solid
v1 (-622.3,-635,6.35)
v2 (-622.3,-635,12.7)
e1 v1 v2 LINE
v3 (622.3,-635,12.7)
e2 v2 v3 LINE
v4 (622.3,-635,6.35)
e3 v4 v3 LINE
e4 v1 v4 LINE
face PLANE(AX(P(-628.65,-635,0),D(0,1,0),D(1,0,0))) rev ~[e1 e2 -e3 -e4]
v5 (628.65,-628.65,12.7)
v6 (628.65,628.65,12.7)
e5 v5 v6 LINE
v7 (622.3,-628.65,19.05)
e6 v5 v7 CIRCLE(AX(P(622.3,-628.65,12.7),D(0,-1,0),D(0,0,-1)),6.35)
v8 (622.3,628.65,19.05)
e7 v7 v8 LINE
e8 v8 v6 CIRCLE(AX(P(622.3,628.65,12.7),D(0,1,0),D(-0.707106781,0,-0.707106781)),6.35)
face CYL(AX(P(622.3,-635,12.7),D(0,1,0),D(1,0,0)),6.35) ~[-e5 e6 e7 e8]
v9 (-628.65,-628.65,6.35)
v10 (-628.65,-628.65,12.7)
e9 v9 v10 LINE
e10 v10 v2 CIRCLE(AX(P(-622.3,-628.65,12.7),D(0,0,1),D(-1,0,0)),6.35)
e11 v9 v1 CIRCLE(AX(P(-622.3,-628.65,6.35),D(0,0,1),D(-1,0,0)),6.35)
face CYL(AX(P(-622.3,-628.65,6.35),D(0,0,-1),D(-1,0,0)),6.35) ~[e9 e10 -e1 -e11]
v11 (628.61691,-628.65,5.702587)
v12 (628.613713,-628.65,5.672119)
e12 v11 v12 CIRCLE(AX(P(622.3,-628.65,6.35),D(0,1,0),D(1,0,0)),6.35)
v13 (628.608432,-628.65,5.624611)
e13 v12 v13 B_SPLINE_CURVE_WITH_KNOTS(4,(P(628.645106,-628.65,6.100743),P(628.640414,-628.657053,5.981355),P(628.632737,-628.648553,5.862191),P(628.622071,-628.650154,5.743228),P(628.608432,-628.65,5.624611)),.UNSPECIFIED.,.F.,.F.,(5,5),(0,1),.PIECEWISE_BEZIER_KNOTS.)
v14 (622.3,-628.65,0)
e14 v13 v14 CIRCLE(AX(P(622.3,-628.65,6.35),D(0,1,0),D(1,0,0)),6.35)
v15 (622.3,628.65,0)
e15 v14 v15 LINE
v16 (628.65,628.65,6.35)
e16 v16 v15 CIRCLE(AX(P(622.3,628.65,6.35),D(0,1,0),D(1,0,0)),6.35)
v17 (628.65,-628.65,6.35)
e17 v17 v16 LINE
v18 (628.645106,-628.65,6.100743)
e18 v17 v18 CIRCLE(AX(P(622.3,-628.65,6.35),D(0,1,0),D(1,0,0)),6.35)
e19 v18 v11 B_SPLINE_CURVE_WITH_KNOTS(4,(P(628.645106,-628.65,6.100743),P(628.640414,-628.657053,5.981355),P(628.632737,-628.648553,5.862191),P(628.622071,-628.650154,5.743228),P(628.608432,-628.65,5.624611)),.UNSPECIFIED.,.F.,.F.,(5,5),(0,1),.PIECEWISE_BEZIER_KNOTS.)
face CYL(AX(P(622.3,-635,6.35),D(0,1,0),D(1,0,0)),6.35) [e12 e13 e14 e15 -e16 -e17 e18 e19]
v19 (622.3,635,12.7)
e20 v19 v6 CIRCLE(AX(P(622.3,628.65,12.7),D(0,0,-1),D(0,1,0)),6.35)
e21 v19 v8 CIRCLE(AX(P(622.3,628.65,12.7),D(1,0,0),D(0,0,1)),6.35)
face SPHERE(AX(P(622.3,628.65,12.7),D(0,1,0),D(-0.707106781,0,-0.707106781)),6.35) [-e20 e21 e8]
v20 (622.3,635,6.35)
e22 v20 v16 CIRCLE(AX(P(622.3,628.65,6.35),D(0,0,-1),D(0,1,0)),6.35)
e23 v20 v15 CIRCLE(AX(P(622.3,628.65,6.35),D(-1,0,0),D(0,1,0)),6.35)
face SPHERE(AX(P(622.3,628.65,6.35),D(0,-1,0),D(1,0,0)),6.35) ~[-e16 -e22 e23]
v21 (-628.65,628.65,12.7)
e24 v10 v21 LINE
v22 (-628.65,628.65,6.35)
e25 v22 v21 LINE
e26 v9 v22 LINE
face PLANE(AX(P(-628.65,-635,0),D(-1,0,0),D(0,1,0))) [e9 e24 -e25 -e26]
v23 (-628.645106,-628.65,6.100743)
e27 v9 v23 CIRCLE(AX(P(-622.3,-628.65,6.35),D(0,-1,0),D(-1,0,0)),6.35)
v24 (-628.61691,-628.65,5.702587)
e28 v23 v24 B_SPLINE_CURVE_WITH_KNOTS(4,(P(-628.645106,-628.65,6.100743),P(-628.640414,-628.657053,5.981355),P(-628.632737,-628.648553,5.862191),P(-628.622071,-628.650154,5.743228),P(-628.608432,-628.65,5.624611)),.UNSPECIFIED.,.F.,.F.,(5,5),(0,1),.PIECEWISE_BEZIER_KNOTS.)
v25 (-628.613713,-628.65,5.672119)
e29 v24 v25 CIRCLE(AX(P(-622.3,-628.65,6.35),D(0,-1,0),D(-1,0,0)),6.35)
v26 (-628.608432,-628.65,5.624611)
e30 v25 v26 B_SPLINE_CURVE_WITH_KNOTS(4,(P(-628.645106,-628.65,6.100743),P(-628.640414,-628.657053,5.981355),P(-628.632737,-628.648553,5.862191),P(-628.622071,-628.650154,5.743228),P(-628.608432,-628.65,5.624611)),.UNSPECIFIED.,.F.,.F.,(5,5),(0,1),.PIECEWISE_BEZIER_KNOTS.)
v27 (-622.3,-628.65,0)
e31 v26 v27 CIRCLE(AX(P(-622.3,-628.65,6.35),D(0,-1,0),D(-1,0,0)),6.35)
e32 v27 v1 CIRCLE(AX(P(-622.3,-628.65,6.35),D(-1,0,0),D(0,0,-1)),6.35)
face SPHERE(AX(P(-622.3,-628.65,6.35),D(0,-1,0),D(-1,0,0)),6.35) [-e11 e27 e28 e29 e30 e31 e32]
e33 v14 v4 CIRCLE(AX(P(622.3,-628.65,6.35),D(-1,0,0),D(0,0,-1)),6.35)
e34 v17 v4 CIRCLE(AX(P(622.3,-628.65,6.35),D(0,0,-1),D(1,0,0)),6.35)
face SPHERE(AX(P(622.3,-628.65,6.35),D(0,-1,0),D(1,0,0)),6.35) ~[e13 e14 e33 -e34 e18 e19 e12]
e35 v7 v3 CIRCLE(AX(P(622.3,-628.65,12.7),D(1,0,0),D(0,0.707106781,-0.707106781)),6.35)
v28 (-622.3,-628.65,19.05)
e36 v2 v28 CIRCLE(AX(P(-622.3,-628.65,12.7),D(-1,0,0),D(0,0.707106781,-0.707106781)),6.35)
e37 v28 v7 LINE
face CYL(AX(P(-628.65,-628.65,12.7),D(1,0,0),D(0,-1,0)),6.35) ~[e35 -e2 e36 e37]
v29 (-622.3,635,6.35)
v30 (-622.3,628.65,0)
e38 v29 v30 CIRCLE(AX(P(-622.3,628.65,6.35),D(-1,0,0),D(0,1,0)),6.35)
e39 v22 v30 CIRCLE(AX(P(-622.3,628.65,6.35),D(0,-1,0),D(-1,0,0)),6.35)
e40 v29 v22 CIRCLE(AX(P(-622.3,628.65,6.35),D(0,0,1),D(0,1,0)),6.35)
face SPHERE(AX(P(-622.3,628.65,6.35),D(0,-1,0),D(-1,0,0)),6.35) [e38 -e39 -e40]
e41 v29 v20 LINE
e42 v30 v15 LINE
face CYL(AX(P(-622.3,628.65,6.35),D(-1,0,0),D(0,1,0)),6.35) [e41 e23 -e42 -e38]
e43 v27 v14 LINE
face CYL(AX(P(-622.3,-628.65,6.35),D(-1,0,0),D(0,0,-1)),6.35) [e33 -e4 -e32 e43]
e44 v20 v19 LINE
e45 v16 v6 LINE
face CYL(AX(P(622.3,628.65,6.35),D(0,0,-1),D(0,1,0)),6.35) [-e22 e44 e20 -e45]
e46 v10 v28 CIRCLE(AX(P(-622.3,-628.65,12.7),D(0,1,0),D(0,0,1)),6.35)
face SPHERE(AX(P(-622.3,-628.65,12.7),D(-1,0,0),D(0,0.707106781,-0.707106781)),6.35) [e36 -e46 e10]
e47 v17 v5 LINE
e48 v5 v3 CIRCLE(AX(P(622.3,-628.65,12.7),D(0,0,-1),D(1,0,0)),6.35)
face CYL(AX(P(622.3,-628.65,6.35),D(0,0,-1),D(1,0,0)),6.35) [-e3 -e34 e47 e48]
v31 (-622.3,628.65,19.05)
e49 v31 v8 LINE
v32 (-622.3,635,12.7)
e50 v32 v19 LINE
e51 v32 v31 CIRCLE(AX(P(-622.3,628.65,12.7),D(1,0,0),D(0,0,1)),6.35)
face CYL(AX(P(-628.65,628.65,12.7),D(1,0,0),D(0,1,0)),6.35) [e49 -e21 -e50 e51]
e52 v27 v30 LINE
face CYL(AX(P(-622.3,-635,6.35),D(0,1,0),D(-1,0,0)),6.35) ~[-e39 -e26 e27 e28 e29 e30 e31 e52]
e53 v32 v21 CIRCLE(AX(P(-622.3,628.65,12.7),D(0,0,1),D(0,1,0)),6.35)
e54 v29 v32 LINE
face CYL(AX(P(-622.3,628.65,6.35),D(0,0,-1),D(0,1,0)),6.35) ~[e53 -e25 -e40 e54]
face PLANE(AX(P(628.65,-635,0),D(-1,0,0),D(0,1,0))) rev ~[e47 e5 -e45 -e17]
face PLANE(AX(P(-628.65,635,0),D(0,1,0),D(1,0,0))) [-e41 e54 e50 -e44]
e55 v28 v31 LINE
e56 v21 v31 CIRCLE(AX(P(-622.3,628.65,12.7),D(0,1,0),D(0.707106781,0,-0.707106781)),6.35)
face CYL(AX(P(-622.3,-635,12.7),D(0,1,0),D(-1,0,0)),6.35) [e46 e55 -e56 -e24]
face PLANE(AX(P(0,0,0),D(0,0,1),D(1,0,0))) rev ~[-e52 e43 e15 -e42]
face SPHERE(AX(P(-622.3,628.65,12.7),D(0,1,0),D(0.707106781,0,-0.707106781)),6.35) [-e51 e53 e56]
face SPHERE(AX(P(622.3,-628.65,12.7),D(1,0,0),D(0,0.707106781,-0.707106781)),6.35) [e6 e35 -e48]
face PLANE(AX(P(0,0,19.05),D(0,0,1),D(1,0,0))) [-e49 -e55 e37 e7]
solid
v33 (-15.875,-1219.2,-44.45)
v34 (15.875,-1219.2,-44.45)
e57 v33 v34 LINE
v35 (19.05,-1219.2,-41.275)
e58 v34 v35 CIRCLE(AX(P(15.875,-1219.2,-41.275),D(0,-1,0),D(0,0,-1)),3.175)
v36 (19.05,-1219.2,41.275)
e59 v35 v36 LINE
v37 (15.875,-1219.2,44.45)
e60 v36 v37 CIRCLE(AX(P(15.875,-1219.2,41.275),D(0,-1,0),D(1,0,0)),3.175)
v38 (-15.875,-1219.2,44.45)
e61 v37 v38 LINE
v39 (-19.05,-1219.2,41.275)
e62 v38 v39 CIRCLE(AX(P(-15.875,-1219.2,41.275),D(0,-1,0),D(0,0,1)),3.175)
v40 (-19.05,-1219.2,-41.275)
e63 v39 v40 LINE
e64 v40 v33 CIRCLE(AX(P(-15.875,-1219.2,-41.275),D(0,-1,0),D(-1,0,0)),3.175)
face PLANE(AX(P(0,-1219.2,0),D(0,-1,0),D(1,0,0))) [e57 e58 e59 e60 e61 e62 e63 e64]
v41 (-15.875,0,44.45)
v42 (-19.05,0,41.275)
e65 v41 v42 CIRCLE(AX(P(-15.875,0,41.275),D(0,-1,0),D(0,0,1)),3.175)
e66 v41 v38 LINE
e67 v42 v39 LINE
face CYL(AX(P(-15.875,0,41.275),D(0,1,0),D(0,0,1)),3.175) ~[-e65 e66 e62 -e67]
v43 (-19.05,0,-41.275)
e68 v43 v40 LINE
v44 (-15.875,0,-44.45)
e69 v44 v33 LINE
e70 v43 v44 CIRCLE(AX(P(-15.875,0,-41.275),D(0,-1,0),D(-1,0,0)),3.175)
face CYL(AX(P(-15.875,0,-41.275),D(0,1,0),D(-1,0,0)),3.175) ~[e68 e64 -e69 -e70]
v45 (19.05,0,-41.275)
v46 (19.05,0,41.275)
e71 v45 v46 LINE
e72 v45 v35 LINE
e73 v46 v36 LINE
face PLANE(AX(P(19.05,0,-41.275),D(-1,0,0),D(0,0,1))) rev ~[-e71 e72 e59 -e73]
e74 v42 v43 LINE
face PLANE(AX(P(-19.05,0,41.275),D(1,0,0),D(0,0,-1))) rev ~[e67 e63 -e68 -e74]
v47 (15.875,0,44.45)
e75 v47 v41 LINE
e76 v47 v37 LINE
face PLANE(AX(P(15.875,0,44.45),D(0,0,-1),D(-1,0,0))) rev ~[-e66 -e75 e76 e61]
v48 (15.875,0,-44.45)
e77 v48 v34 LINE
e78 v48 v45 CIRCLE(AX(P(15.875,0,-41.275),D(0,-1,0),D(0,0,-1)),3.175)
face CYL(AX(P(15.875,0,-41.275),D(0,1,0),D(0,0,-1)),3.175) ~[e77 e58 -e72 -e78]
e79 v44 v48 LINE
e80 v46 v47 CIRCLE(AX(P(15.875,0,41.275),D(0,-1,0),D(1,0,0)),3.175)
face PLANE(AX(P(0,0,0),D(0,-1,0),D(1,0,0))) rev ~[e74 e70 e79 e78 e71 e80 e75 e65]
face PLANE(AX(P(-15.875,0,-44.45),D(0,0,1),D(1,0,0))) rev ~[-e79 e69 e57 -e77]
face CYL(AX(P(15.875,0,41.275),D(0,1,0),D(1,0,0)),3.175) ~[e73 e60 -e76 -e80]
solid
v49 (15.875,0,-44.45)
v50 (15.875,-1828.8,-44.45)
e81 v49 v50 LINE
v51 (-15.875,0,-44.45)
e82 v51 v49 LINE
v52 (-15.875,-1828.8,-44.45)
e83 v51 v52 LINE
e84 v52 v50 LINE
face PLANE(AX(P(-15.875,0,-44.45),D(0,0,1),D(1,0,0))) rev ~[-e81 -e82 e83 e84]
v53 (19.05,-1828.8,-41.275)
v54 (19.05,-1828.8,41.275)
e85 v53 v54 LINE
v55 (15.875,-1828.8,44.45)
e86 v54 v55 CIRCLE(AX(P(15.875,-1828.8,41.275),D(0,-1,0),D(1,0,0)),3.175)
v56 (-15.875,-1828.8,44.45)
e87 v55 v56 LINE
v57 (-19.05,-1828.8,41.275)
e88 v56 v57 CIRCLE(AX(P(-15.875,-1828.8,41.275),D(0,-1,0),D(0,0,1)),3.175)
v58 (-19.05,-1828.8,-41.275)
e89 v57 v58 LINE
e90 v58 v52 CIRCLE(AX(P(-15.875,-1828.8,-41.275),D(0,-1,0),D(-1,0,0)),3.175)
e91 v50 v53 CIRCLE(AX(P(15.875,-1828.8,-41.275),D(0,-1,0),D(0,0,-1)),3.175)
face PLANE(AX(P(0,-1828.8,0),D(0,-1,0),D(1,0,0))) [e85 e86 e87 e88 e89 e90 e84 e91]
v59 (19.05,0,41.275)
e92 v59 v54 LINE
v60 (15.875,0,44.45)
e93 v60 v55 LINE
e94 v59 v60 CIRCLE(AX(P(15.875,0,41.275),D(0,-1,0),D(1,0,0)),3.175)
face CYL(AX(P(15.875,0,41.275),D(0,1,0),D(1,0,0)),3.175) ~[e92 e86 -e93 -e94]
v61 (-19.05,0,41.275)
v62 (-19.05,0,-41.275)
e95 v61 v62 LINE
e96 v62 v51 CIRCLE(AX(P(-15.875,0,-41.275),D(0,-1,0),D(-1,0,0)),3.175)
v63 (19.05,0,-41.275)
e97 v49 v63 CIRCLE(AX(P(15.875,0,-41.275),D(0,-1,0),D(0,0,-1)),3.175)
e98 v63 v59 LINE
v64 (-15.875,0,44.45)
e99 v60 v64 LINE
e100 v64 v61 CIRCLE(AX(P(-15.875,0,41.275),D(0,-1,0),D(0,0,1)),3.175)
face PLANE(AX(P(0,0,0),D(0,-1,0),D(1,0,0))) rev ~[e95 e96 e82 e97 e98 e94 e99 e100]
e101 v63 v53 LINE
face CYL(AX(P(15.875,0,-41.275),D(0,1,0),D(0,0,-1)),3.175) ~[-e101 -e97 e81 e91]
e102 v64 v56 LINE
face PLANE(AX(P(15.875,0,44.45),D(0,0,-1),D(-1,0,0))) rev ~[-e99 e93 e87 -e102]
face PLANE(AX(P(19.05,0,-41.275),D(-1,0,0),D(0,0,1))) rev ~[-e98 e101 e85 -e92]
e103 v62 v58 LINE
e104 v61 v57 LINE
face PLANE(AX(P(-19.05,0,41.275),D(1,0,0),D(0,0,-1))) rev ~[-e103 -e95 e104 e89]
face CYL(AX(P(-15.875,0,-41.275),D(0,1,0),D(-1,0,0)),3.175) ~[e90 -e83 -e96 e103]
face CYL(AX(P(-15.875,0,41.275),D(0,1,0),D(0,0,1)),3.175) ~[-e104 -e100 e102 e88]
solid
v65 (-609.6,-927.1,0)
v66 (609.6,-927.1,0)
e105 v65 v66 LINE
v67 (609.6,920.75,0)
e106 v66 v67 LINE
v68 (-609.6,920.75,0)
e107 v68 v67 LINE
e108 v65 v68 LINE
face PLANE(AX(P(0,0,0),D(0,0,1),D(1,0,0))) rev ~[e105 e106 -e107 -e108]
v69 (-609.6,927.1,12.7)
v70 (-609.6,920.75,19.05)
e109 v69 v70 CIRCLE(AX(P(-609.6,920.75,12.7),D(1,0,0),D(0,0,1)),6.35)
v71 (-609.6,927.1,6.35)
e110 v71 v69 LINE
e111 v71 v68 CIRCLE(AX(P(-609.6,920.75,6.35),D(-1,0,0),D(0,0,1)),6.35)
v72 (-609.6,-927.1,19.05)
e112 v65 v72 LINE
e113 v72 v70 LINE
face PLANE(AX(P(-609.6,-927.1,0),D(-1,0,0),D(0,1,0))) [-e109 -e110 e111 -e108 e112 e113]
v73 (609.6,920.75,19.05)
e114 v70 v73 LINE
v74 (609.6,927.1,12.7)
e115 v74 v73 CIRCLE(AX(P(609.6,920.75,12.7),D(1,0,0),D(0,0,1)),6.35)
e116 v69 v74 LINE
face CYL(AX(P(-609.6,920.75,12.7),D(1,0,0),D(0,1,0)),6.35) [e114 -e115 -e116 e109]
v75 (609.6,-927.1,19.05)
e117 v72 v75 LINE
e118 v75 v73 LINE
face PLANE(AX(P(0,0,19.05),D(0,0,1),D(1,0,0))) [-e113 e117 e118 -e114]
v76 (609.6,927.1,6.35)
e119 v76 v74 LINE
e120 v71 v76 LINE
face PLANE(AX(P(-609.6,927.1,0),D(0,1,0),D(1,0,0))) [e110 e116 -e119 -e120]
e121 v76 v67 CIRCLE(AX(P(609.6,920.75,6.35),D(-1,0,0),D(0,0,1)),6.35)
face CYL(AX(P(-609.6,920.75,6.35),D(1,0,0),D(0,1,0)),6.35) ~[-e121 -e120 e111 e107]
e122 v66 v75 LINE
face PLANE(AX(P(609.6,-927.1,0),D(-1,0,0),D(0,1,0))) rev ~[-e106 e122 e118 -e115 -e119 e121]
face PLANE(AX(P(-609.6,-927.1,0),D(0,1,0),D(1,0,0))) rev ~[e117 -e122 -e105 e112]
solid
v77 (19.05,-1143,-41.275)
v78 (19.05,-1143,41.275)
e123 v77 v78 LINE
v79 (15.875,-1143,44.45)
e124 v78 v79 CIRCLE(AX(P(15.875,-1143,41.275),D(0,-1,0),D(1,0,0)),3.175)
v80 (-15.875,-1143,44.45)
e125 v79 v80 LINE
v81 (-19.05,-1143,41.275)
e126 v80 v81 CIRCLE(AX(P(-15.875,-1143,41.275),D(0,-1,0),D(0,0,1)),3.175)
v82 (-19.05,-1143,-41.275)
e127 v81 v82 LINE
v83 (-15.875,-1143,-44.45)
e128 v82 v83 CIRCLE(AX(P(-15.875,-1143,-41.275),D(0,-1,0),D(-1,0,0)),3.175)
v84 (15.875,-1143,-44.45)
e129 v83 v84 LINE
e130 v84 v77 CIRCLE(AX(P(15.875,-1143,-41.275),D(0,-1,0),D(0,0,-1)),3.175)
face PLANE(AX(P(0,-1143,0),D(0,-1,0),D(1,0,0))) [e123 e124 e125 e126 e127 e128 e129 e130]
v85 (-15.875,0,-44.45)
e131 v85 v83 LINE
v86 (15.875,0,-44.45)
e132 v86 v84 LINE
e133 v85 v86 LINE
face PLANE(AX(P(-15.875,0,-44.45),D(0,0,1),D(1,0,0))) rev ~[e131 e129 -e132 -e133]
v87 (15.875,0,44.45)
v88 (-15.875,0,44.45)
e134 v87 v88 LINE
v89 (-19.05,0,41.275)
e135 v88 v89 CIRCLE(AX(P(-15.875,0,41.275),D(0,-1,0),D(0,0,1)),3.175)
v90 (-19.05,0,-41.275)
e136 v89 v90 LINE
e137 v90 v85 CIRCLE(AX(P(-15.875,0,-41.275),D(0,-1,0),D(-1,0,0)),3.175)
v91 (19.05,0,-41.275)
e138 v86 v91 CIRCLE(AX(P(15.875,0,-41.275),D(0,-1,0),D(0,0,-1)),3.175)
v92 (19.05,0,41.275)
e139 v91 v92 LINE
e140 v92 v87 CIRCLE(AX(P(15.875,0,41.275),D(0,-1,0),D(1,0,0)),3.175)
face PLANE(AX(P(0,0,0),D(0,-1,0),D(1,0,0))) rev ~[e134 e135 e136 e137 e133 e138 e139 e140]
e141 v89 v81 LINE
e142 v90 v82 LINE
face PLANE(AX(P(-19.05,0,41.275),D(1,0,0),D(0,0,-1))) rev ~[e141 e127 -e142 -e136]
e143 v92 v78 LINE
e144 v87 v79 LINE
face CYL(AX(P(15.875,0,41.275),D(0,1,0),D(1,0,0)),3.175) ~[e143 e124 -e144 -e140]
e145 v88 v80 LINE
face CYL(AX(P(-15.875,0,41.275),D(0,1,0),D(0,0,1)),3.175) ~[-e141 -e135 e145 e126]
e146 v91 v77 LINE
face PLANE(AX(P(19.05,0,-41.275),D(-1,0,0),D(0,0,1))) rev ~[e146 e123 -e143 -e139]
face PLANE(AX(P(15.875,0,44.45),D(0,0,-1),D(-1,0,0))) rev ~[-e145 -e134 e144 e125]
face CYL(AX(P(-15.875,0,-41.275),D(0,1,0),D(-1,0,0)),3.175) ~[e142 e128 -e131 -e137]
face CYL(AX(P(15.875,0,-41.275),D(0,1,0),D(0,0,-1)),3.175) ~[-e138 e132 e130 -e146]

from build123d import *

# Parameters (mm, degrees)
F1_DEPTH     = 1219.2
F2_DEPTH     = 1143
F3_W         = 1257.3
F3_H         = 1270
F4_DEPTH     = 19.05
F5_R         = 6.35
F6_T1_DEPTH  = 1244.6
F6_T3_DEPTH  = 6.35
F6_S7_W      = 6.477
F6_S7_H      = 6.477
F6_T8_DEPTH  = 6.477
F6_S13_W     = 6.477
F6_S13_H     = 6.477
F6_T14_DEPTH = 6.477
F6_S19_W     = 6.477
F6_S19_H     = 6.477
F6_T20_DEPTH = 6.477
F6_S25_W     = 6.477
F6_S25_H     = 6.477
F6_T26_DEPTH = 6.477
F6_T30_ANGLE = 90
F6_T32_ANGLE = 90
F6_T34_ANGLE = 90
F6_T36_ANGLE = 90
F7_DEPTH     = 1828.8
F8_W         = 1219.2
F8_H         = 1854.2
F9_DEPTH     = 19.05
F10_R        = 6.35


# Not quite as in the source:
# - a fillet or chamfer that OpenCascade refuses, or shapes differently, is made with other operations: its cross-section is extruded or revolved along the edge and cut away or added


with BuildPart() as f1:
    # F0 (on Front) → F1 (new body)
    with BuildSketch(Plane.XZ):
        with BuildLine():
            ThreePointArc((19.05, 41.275), (18.1200640303, 43.5200640303), (15.875, 44.45))
            Line((15.875, 44.45), (-15.875, 44.45))
            ThreePointArc((-15.875, 44.45), (-18.1200640303, 43.5200640303), (-19.05, 41.275))
            Line((-19.05, 41.275), (-19.05, -41.275))
            ThreePointArc((-19.05, -41.275), (-18.1200640303, -43.5200640303), (-15.875, -44.45))
            Line((-15.875, -44.45), (15.875, -44.45))
            ThreePointArc((15.875, -44.45), (18.1200640303, -43.5200640303), (19.05, -41.275))
            Line((19.05, -41.275), (19.05, 41.275))
        make_face()
    extrude(amount=F1_DEPTH)


with BuildPart() as f2:
    # F0 (on Front) → F2 (new body)
    with BuildSketch(Plane.XZ):
        with BuildLine():
            ThreePointArc((19.05, 41.275), (18.1200640303, 43.5200640303), (15.875, 44.45))
            Line((15.875, 44.45), (-15.875, 44.45))
            ThreePointArc((-15.875, 44.45), (-18.1200640303, 43.5200640303), (-19.05, 41.275))
            Line((-19.05, 41.275), (-19.05, -41.275))
            ThreePointArc((-19.05, -41.275), (-18.1200640303, -43.5200640303), (-15.875, -44.45))
            Line((-15.875, -44.45), (15.875, -44.45))
            ThreePointArc((15.875, -44.45), (18.1200640303, -43.5200640303), (19.05, -41.275))
            Line((19.05, -41.275), (19.05, 41.275))
        make_face()
    extrude(amount=F2_DEPTH)


with BuildPart() as f4:
    # F3 (on Top) → F4 (new body)
    with BuildSketch(Plane.XY):
        Rectangle(F3_W, F3_H)
    extrude(amount=F4_DEPTH)

    # F5
    f5_edges = [f4.edges().sort_by_distance(p)[0] for p in [
        (-628.65, 0, 19.05),
        (0, -635, 19.05),
        (0, 635, 19.05),
        (628.65, 0, 19.05),
        (628.65, 0, 0),
        (-628.65, 0, 0),
    ]]
    fillet(f5_edges, radius=F5_R)

    # F6: fillet of radius 6.35 on 2 edges, made by hand

    # F6_s2 → F6_t1 (cut)
    with BuildSketch(Plane.YZ.offset(-622.3)):
        with BuildLine():
            ThreePointArc((-628.65, 0), (-633.1401280605, 1.8598719395), (-635, 6.35))
            Line((-635, 6.35), (-635.127, 6.35))
            Line((-635.127, 6.35), (-635.127, -0.127))
            Line((-635.127, -0.127), (-628.65, -0.127))
            Line((-628.65, -0.127), (-628.65, 0))
        make_face()
        with BuildLine():
            ThreePointArc((635, 6.35), (633.1401280605, 1.8598719395), (628.65, 0))
            Line((628.65, 0), (628.65, -0.127))
            Line((628.65, -0.127), (635.127, -0.127))
            Line((635.127, -0.127), (635.127, 6.35))
            Line((635.127, 6.35), (635, 6.35))
        make_face()
    extrude(amount=F6_T1_DEPTH, mode=Mode.SUBTRACT)

    # F6_s4 → F6_t3 (cut)
    with BuildSketch(Plane.XY.offset(6.35)):
        with BuildLine():
            ThreePointArc((-622.3, 635), (-626.7901280605, 633.1401280605), (-628.65, 628.65))
            Line((-628.65, 628.65), (-628.777, 628.65))
            Line((-628.777, 628.65), (-628.777, 635.127))
            Line((-628.777, 635.127), (-622.3, 635.127))
            Line((-622.3, 635.127), (-622.3, 635))
        make_face()
        with BuildLine():
            ThreePointArc((622.3, 635), (626.7901280605, 633.1401280605), (628.65, 628.65))
            Line((628.65, 628.65), (628.777, 628.65))
            Line((628.777, 628.65), (628.777, 635.127))
            Line((628.777, 635.127), (622.3, 635.127))
            Line((622.3, 635.127), (622.3, 635))
        make_face()
        with BuildLine():
            ThreePointArc((628.65, -628.65), (626.7901280605, -633.1401280605), (622.3, -635))
            Line((622.3, -635), (622.3, -635.127))
            Line((622.3, -635.127), (628.777, -635.127))
            Line((628.777, -635.127), (628.777, -628.65))
            Line((628.777, -628.65), (628.65, -628.65))
        make_face()
        with BuildLine():
            ThreePointArc((-628.65, -628.65), (-626.7901280605, -633.1401280605), (-622.3, -635))
            Line((-622.3, -635), (-622.3, -635.127))
            Line((-622.3, -635.127), (-628.777, -635.127))
            Line((-628.777, -635.127), (-628.777, -628.65))
            Line((-628.777, -628.65), (-628.65, -628.65))
        make_face()
    extrude(amount=F6_T3_DEPTH, mode=Mode.SUBTRACT)


with BuildPart() as f6_tool6:
    # F6_s7 → F6_t8 (new body)
    with BuildSketch(Plane.XZ.offset(-628.65)):
        with Locations((-625.5385, 15.9385)):
            Rectangle(F6_S7_W, F6_S7_H)
    extrude(amount=-F6_T8_DEPTH)

    # F6_s9 → F6_t10 (revolve, cut)
    with BuildSketch(Plane(origin=(-622.3, 628.65, 12.7), x_dir=(0.7071067812, 0, -0.7071067812), z_dir=(0.7071067812, 0, 0.7071067812))):
        with BuildLine():
            ThreePointArc((0, -6.35), (6.35, 0), (0, 6.35))
            Line((0, 6.35), (0, -6.35))
        make_face()
    revolve(axis=Axis((-622.3, 628.65, 12.7), (0, 1, 0)), mode=Mode.SUBTRACT)


with BuildPart() as f4_1:
    add(f4.part)

    # F6_t5: cut F6_tool6
    add(f6_tool6.part, mode=Mode.SUBTRACT)


with BuildPart() as f6_tool12:
    # F6_s13 → F6_t14 (new body)
    with BuildSketch(Plane.XZ.offset(-628.65)):
        with Locations((625.5385, 15.9385)):
            Rectangle(F6_S13_W, F6_S13_H)
    extrude(amount=-F6_T14_DEPTH)

    # F6_s15 → F6_t16 (revolve, cut)
    with BuildSketch(Plane(origin=(622.3, 628.65, 12.7), x_dir=(-0.7071067812, 0, -0.7071067812), z_dir=(0.7071067812, 0, -0.7071067812))):
        with BuildLine():
            ThreePointArc((0, -6.35), (6.35, 0), (0, 6.35))
            Line((0, 6.35), (0, -6.35))
        make_face()
    revolve(axis=Axis((622.3, 628.65, 12.7), (0, 1, 0)), mode=Mode.SUBTRACT)


with BuildPart() as f4_2:
    add(f4_1.part)

    # F6_t11: cut F6_tool12
    add(f6_tool12.part, mode=Mode.SUBTRACT)


with BuildPart() as f6_tool18:
    # F6_s19 → F6_t20 (new body)
    with BuildSketch(Plane.YZ.offset(622.3)):
        with Locations((-631.8885, 15.9385)):
            Rectangle(F6_S19_W, F6_S19_H)
    extrude(amount=F6_T20_DEPTH)

    # F6_s21 → F6_t22 (revolve, cut)
    with BuildSketch(Plane(origin=(622.3, -628.65, 12.7), x_dir=(0, 0.7071067812, -0.7071067812), z_dir=(0, -0.7071067812, -0.7071067812))):
        with BuildLine():
            ThreePointArc((0, -6.35), (6.35, 0), (0, 6.35))
            Line((0, 6.35), (0, -6.35))
        make_face()
    revolve(axis=Axis((622.3, -628.65, 12.7), (1, 0, 0)), mode=Mode.SUBTRACT)


with BuildPart() as f4_3:
    add(f4_2.part)

    # F6_t17: cut F6_tool18
    add(f6_tool18.part, mode=Mode.SUBTRACT)


with BuildPart() as f6_tool24:
    # F6_s25 → F6_t26 (new body)
    with BuildSketch(Plane.YZ.offset(-622.3)):
        with Locations((-631.8885, 15.9385)):
            Rectangle(F6_S25_W, F6_S25_H)
    extrude(amount=-F6_T26_DEPTH)

    # F6_s27 → F6_t28 (revolve, cut)
    with BuildSketch(Plane(origin=(-622.3, -628.65, 12.7), x_dir=(0, 0.7071067812, -0.7071067812), z_dir=(0, 0.7071067812, 0.7071067812))):
        with BuildLine():
            ThreePointArc((0, -6.35), (6.35, 0), (0, 6.35))
            Line((0, 6.35), (0, -6.35))
        make_face()
    revolve(axis=Axis((-622.3, -628.65, 12.7), (-1, 0, 0)), mode=Mode.SUBTRACT)


with BuildPart() as f4_4:
    add(f4_3.part)

    # F6_t23: cut F6_tool24
    add(f6_tool24.part, mode=Mode.SUBTRACT)

    # F6_s29 → F6_t30 (revolve, cut)
    with BuildSketch(Plane.XY.offset(6.35)):
        with BuildLine():
            ThreePointArc((622.3, 635), (626.7901280605, 633.1401280605), (628.65, 628.65))
            Line((628.65, 628.65), (628.777, 628.65))
            Line((628.777, 628.65), (628.777, 635.127))
            Line((628.777, 635.127), (622.3, 635.127))
            Line((622.3, 635.127), (622.3, 635))
        make_face()
    revolve(axis=Axis((622.3, 635, 6.35), (0, 1, 0)), revolution_arc=F6_T30_ANGLE, mode=Mode.SUBTRACT)

    # F6_s31 → F6_t32 (revolve, cut)
    with BuildSketch(Plane.XY.offset(6.35)):
        with BuildLine():
            ThreePointArc((-622.3, 635), (-626.7901280605, 633.1401280605), (-628.65, 628.65))
            Line((-628.65, 628.65), (-628.777, 628.65))
            Line((-628.777, 628.65), (-628.777, 635.127))
            Line((-628.777, 635.127), (-622.3, 635.127))
            Line((-622.3, 635.127), (-622.3, 635))
        make_face()
    revolve(axis=Axis((-622.3, 635, 6.35), (0, -1, 0)), revolution_arc=F6_T32_ANGLE, mode=Mode.SUBTRACT)

    # F6_s33 → F6_t34 (revolve, cut)
    with BuildSketch(Plane.XY.offset(6.35)):
        with BuildLine():
            ThreePointArc((-628.65, -628.65), (-626.7901280605, -633.1401280605), (-622.3, -635))
            Line((-622.3, -635), (-622.3, -635.127))
            Line((-622.3, -635.127), (-628.777, -635.127))
            Line((-628.777, -635.127), (-628.777, -628.65))
            Line((-628.777, -628.65), (-628.65, -628.65))
        make_face()
    revolve(axis=Axis((-622.3, -635, 6.35), (0, -1, 0)), revolution_arc=F6_T34_ANGLE, mode=Mode.SUBTRACT)

    # F6_s35 → F6_t36 (revolve, cut)
    with BuildSketch(Plane.XY.offset(6.35)):
        with BuildLine():
            ThreePointArc((628.65, -628.65), (626.7901280605, -633.1401280605), (622.3, -635))
            Line((622.3, -635), (622.3, -635.127))
            Line((622.3, -635.127), (628.777, -635.127))
            Line((628.777, -635.127), (628.777, -628.65))
            Line((628.777, -628.65), (628.65, -628.65))
        make_face()
    revolve(axis=Axis((622.3, -635, 6.35), (0, 1, 0)), revolution_arc=F6_T36_ANGLE, mode=Mode.SUBTRACT)


with BuildPart() as f7:
    # F0 (on Front) → F7 (new body)
    with BuildSketch(Plane.XZ):
        with BuildLine():
            ThreePointArc((19.05, 41.275), (18.1200640303, 43.5200640303), (15.875, 44.45))
            Line((15.875, 44.45), (-15.875, 44.45))
            ThreePointArc((-15.875, 44.45), (-18.1200640303, 43.5200640303), (-19.05, 41.275))
            Line((-19.05, 41.275), (-19.05, -41.275))
            ThreePointArc((-19.05, -41.275), (-18.1200640303, -43.5200640303), (-15.875, -44.45))
            Line((-15.875, -44.45), (15.875, -44.45))
            ThreePointArc((15.875, -44.45), (18.1200640303, -43.5200640303), (19.05, -41.275))
            Line((19.05, -41.275), (19.05, 41.275))
        make_face()
    extrude(amount=F7_DEPTH)


with BuildPart() as f9:
    # F8 (on Top) → F9 (new body)
    with BuildSketch(Plane.XY):
        Rectangle(F8_W, F8_H)
    extrude(amount=F9_DEPTH)

    # F10
    f10_edges = [f9.edges().sort_by_distance(p)[0] for p in [
        (0, 927.1, 19.05),
        (0, 927.1, 0),
    ]]
    fillet(f10_edges, radius=F10_R)


solid = Compound([f1.part, f2.part, f4_4.part, f7.part, f9.part])
